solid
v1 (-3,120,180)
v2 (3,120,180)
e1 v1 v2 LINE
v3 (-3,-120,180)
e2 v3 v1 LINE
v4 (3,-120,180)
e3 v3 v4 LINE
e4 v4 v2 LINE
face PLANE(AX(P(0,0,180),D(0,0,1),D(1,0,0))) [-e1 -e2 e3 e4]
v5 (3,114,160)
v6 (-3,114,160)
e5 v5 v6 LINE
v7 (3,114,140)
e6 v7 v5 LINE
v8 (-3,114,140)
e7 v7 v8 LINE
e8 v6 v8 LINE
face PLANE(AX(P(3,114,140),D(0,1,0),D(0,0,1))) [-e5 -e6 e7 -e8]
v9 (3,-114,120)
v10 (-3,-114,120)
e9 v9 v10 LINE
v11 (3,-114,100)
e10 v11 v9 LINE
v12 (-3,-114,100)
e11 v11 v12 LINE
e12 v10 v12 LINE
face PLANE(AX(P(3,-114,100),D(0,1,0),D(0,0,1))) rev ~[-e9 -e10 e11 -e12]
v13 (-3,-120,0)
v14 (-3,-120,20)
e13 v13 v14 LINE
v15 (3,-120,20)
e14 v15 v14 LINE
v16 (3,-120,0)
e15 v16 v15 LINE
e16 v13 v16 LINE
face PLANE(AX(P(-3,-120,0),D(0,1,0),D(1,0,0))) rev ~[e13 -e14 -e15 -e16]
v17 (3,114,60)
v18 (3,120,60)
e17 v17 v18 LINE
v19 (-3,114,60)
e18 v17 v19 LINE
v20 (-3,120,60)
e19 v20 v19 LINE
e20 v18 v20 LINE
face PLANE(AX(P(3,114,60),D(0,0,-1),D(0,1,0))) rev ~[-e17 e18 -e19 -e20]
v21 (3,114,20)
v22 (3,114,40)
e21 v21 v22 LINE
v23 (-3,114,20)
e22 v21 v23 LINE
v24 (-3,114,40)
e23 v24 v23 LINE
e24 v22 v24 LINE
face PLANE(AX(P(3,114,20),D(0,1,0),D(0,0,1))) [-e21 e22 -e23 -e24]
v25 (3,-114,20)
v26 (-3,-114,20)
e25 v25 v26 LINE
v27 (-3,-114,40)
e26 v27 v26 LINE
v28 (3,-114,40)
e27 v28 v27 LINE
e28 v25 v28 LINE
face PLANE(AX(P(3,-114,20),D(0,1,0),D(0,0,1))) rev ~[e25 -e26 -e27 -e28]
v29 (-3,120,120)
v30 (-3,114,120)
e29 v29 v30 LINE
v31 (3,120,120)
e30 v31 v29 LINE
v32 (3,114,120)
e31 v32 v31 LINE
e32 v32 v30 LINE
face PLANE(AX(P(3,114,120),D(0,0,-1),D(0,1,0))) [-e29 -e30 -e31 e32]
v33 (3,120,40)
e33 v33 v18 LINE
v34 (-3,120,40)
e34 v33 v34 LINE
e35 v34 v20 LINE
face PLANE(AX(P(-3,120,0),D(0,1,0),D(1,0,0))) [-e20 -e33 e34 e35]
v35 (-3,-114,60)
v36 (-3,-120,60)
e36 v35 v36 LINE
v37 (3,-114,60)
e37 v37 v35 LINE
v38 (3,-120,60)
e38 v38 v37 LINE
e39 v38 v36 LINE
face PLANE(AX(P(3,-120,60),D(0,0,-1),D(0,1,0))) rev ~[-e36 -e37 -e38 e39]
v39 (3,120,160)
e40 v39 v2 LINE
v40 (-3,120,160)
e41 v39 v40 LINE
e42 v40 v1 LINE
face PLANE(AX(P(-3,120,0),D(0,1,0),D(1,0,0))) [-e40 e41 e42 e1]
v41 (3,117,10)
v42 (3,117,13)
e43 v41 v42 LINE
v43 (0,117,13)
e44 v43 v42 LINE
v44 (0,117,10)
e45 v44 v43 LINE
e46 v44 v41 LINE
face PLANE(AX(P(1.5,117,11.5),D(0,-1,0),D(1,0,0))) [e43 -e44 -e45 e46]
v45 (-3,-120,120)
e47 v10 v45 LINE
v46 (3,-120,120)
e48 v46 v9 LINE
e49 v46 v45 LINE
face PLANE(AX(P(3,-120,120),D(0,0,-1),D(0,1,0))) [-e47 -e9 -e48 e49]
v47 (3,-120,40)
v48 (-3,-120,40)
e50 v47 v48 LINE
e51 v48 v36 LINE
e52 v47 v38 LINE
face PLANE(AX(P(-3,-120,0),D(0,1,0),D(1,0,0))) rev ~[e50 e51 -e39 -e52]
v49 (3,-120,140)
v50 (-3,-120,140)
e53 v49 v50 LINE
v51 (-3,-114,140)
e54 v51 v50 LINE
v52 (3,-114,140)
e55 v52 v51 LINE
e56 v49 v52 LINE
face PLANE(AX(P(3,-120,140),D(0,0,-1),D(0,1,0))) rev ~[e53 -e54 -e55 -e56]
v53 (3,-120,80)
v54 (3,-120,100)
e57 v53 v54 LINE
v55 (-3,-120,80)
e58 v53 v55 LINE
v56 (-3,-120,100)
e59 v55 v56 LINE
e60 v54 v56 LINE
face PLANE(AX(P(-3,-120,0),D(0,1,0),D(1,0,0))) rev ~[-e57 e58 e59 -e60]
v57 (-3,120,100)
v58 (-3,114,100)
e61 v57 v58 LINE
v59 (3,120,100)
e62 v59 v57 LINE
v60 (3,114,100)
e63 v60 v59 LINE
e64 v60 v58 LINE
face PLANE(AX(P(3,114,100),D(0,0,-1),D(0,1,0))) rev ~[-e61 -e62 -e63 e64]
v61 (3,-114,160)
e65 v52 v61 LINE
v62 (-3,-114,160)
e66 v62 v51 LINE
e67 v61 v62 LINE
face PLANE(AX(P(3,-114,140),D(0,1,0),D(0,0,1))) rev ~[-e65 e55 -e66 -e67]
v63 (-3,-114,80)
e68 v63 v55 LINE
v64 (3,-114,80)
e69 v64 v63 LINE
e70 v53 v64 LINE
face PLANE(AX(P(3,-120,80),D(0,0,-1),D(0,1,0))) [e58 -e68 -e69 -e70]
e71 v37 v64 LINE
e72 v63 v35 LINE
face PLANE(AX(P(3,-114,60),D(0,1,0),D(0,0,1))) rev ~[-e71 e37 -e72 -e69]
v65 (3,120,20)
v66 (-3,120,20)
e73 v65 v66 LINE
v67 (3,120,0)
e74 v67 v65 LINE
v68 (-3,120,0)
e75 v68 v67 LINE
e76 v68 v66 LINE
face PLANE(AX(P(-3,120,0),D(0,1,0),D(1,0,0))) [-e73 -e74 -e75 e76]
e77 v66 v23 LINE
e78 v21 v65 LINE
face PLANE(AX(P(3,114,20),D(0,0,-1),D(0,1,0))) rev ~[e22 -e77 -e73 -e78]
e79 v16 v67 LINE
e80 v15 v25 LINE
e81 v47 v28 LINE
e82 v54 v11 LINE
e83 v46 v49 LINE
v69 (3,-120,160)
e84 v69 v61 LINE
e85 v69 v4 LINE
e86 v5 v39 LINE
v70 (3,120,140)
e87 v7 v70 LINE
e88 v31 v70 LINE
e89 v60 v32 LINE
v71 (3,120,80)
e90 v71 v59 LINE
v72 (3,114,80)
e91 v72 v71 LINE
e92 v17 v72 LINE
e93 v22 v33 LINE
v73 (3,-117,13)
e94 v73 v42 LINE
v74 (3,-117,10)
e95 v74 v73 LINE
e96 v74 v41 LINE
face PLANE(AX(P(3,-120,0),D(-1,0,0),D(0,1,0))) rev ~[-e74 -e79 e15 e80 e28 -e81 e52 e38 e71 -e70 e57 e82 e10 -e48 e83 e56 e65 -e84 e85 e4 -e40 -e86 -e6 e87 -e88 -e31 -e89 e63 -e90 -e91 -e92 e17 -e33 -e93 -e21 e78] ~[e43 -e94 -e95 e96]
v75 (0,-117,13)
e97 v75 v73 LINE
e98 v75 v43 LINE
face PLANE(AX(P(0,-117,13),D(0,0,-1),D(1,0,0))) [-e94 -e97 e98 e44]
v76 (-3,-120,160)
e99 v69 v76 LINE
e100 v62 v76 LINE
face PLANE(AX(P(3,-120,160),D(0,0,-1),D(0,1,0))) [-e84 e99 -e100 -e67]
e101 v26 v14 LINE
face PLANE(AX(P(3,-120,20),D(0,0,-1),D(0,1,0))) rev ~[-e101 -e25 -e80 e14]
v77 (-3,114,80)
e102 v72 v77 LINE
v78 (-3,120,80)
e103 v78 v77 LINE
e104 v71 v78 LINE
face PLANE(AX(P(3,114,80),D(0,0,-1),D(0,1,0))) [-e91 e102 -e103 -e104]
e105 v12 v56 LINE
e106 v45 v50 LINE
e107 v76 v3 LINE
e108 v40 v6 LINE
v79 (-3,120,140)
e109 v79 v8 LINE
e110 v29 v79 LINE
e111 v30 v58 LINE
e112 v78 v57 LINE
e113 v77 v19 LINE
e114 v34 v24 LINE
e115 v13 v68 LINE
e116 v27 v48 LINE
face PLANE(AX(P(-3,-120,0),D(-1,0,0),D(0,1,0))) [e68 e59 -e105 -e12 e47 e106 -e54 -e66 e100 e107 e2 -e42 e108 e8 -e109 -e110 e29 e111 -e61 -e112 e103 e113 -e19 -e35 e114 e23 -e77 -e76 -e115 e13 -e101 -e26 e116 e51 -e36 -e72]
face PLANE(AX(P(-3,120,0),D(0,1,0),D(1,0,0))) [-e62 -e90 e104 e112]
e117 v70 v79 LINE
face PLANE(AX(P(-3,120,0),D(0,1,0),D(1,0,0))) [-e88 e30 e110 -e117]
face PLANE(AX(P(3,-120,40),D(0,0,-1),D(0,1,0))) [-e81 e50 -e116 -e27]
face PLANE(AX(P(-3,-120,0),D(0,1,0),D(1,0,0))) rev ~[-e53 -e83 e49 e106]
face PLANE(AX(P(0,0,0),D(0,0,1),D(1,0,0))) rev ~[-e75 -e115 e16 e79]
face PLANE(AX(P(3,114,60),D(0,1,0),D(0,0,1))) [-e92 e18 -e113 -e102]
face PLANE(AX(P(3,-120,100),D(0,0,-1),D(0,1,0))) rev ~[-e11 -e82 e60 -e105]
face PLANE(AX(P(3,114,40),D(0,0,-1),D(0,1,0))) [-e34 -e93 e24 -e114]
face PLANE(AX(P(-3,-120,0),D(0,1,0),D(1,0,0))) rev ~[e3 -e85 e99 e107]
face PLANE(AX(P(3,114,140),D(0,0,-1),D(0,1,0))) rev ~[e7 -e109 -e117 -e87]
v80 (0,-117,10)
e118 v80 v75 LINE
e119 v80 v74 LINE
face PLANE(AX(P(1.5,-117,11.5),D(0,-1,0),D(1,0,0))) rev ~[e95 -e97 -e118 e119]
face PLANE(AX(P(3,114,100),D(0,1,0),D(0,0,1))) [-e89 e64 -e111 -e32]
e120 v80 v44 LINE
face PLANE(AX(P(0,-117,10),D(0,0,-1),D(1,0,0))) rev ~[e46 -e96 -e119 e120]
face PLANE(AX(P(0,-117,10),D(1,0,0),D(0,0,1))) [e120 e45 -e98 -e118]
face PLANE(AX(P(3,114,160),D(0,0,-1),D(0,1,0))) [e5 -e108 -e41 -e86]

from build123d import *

# Parameters (mm, degrees)
F0_W     = 6
F0_H     = 240
F1_DEPTH = 180
F3_START = -3
F2_W     = 3
F2_H     = 3
F3_DEPTH = 234
F4_W     = 6
F4_H     = 20
F5_DEPTH = 6.001


with BuildPart() as f1:
    # F0 (on Top) → F1 (new body)
    with BuildSketch(Plane.XY):
        Rectangle(F0_W, F0_H)
    extrude(amount=F1_DEPTH)

    # F2 (on face) → F3 (cut)
    with BuildSketch(Plane.XZ.offset(120).offset(F3_START)):
        with Locations((1.5, 11.5)):
            Rectangle(F2_W, F2_H)
    extrude(amount=-F3_DEPTH, mode=Mode.SUBTRACT)

    # F4 (on face) → F5 (cut, through all)
    with BuildSketch(Plane.YZ.offset(3)):
        with Locations((-117, 30)):
            Rectangle(F4_W, F4_H)
        with Locations((-117, 70)):
            Rectangle(F4_W, F4_H)
        with Locations((-117, 110)):
            Rectangle(F4_W, F4_H)
        with Locations((-117, 150)):
            Rectangle(F4_W, F4_H)
        with Locations((117, 150)):
            Rectangle(F4_W, F4_H)
        with Locations((117, 110)):
            Rectangle(F4_W, F4_H)
        with Locations((117, 70)):
            Rectangle(F4_W, F4_H)
        with Locations((117, 30)):
            Rectangle(F4_W, F4_H)
    extrude(amount=-F5_DEPTH, mode=Mode.SUBTRACT)


solid = f1.part
